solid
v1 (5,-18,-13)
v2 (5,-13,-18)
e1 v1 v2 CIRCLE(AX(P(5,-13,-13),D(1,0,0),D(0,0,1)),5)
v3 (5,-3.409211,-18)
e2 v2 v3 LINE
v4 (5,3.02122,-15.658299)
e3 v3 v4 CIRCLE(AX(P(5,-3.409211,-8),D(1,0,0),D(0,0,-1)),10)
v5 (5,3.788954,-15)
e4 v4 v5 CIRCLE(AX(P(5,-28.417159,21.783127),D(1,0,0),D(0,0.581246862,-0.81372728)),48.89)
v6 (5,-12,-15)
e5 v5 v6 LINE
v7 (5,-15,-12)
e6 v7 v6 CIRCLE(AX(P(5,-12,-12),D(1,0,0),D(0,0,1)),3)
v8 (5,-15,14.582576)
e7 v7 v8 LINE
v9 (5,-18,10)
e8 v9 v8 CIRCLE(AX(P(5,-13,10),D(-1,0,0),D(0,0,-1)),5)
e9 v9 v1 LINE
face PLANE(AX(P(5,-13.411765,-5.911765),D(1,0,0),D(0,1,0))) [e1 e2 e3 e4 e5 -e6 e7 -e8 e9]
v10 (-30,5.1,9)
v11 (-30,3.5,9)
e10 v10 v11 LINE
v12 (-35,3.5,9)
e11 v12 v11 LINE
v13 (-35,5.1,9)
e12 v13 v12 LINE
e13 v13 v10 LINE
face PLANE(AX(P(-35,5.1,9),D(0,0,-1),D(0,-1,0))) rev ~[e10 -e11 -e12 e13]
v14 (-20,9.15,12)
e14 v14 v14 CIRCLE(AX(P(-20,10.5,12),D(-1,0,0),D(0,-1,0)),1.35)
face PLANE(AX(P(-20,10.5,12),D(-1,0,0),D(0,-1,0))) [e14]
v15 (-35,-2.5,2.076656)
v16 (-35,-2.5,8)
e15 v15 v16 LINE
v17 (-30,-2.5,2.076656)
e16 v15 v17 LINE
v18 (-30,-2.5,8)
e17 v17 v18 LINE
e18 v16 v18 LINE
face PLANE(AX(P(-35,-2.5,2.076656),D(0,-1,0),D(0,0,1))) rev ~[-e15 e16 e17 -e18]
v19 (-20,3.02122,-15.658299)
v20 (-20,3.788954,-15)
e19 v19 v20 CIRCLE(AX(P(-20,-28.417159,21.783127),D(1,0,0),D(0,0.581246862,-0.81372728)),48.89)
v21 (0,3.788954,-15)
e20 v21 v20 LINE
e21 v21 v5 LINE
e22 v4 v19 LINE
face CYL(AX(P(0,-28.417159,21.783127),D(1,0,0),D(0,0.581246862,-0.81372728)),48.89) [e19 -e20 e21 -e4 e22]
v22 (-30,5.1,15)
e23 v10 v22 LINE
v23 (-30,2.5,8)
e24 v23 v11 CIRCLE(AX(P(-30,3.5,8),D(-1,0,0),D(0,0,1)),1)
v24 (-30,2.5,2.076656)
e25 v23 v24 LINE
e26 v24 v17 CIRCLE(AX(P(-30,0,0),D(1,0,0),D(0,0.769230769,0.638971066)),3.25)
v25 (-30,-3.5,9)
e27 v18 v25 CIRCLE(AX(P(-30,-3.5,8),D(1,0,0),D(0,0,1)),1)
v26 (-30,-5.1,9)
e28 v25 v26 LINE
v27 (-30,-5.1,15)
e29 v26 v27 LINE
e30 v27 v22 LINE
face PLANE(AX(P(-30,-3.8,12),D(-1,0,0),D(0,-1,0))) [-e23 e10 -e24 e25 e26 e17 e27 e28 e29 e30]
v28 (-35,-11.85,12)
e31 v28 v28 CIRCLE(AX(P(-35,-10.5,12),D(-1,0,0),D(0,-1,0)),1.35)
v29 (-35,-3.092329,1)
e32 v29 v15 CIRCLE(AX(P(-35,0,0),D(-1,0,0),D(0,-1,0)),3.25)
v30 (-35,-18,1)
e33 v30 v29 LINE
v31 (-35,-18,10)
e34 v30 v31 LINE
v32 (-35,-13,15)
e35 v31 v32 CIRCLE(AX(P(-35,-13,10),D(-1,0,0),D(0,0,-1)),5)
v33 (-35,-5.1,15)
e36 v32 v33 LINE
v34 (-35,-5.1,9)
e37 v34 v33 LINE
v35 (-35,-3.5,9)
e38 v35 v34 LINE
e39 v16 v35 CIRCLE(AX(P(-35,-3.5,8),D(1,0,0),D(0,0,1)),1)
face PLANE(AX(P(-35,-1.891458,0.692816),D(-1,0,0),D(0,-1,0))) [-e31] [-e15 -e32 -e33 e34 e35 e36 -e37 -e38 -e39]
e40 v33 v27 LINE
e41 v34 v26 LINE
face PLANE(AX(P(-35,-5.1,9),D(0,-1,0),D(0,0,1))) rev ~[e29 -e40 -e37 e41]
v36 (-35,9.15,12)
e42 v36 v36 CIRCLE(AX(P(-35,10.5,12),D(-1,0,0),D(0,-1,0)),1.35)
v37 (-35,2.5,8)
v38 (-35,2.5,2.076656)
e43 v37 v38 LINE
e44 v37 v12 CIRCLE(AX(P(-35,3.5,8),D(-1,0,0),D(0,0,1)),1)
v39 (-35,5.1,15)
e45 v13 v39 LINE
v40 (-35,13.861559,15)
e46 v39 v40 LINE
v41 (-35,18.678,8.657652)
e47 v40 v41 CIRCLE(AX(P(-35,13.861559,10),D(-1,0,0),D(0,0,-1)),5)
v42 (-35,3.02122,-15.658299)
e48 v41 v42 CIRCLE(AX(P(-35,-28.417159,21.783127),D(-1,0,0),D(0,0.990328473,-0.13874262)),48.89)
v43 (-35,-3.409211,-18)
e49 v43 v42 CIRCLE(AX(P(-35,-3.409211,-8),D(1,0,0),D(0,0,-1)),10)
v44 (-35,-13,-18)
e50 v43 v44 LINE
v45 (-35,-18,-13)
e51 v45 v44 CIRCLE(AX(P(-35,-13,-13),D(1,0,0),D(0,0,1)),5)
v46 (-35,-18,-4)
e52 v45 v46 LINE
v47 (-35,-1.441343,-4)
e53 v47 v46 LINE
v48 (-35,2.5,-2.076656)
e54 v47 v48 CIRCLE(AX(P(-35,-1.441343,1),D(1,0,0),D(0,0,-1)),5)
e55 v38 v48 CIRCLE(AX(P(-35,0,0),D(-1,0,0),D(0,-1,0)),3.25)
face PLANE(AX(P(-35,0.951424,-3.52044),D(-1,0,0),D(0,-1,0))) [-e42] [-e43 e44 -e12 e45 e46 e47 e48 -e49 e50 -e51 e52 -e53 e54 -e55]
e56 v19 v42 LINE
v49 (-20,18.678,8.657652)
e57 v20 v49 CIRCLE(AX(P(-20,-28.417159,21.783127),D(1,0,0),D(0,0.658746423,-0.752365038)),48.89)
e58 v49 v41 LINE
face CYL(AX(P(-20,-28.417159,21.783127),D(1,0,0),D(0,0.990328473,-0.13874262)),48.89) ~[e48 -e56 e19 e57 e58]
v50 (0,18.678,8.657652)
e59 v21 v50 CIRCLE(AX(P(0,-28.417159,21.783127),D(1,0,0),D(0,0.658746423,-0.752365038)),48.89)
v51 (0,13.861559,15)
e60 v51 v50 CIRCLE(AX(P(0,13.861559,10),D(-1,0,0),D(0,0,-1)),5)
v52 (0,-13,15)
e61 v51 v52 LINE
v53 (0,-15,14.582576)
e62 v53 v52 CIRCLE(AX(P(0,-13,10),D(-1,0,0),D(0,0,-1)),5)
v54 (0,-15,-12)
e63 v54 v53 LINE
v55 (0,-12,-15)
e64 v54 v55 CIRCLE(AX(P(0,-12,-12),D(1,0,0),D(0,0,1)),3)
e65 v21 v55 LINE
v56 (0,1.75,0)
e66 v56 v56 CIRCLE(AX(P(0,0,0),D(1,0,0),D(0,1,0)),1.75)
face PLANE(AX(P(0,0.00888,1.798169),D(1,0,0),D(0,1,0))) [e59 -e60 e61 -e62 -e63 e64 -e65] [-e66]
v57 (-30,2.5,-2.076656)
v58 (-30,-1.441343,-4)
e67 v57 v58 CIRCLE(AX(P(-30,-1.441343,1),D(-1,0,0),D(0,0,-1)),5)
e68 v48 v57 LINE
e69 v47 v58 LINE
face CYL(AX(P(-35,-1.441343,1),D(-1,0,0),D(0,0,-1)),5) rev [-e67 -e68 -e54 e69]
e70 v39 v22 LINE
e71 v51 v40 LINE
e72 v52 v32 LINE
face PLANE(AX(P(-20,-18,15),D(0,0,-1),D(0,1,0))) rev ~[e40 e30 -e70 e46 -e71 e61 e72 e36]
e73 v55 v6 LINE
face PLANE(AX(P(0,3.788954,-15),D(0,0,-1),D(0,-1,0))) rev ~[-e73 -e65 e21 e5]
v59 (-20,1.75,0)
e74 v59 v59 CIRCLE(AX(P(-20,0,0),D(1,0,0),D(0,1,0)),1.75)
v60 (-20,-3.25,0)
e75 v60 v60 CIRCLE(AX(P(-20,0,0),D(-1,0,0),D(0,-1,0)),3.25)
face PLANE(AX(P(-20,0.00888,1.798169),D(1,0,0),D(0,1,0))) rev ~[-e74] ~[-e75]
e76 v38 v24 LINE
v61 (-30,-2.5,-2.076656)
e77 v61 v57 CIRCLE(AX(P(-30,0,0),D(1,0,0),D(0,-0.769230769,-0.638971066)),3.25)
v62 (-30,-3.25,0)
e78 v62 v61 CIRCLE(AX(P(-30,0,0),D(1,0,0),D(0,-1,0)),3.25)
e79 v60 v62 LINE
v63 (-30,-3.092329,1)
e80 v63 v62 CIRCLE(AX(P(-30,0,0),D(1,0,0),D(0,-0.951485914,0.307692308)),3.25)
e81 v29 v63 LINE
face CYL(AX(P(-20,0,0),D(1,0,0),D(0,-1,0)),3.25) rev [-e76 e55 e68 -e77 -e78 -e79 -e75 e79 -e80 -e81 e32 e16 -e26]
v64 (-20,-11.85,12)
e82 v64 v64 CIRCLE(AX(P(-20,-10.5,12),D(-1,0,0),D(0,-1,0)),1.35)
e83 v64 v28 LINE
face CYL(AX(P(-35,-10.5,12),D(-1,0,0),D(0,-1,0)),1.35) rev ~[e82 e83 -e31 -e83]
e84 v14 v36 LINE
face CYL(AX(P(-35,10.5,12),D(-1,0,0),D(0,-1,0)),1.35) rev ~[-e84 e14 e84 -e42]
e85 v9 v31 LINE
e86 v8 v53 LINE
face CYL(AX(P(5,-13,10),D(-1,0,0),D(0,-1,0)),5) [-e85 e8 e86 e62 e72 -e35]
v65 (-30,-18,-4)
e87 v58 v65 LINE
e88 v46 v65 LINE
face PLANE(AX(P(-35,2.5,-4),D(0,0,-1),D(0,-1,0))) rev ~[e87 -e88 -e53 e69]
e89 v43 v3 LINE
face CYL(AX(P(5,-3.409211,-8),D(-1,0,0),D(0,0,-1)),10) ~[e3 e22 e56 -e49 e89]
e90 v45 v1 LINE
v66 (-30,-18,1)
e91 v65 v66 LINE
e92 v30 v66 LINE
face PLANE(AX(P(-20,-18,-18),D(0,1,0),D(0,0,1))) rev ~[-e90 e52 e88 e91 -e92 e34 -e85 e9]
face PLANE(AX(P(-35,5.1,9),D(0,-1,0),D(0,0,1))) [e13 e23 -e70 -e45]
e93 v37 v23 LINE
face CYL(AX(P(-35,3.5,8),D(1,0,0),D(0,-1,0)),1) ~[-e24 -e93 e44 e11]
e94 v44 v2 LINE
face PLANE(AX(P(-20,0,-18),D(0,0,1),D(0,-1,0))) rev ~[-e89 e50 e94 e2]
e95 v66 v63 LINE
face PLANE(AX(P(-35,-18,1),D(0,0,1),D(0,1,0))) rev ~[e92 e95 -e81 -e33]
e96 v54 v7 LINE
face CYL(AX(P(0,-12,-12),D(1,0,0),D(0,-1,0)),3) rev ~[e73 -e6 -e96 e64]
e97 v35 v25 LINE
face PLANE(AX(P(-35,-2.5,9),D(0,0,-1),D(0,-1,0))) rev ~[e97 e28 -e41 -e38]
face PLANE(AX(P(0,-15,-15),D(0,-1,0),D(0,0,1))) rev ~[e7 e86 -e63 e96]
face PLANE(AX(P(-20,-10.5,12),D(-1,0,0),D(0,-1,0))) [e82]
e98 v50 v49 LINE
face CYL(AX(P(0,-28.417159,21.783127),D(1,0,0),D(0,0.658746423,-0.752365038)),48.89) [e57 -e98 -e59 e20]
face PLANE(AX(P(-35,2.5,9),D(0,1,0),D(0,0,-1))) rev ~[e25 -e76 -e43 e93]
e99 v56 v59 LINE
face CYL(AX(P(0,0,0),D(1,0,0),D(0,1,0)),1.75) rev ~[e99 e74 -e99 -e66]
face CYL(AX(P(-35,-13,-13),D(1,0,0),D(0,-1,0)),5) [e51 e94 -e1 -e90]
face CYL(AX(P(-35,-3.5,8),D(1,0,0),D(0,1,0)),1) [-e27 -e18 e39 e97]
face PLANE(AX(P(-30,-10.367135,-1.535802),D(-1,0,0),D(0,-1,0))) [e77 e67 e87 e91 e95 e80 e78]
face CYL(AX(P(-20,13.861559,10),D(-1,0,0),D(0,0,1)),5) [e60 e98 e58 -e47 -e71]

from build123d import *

# Parameters (mm, degrees)
F1_DEPTH     = 5
F0_R         = 1.75
F2_DEPTH     = 20
F3_R         = 3.25
F4_DEPTH     = 15
F5_R         = 1.35
F5_W         = 2.6
F5_H         = 6
F5_W_2       = 5
F6_DEPTH     = 5
F7_DEPTH     = 10
F8_R         = 3
F9_R         = 5
F10_T1_DEPTH = 14.8533585862
F11_R        = 1
F12_R        = 5
F13_R        = 5
F14_R        = 10


# Not quite as in the source:
# - a fillet or chamfer that OpenCascade refuses, or shapes differently, is made with other operations: its cross-section is extruded or revolved along the edge and cut away or added


with BuildPart() as f1:
    # F0 (on Right) → F1 (new body)
    with BuildSketch(Plane.YZ):
        Polygon((-15, -15), (-15, 0), (-15, 15), (-18, 15), (-18, 0), (-18, -18), (0, -18), (0, -15), align=None)
        with BuildLine():
            Line((3.7889535467, -15), (0, -15))
            Line((0, -15), (0, -18))
            ThreePointArc((0, -18), (1.9315685392, -16.546846326), (3.7889535467, -15))
        make_face()
    extrude(amount=F1_DEPTH)

    # F0 (on Right) → F2 (join)
    with BuildSketch(Plane.YZ):
        with BuildLine():
            Line((-15, 15), (-15, 0))
            Line((-15, 0), (-15, -15))
            Line((-15, -15), (0, -15))
            Line((0, -15), (3.7889535467, -15))
            ThreePointArc((3.7889535467, -15), (14.5947925758, -1.4591648304), (20, 15))
            Line((20, 15), (-15, 15))
        make_face()
        Circle(F0_R, mode=Mode.SUBTRACT)
        Polygon((-15, -15), (-15, 0), (-15, 15), (-18, 15), (-18, 0), (-18, -18), (0, -18), (0, -15), align=None)
        with BuildLine():
            Line((3.7889535467, -15), (0, -15))
            Line((0, -15), (0, -18))
            ThreePointArc((0, -18), (1.9315685392, -16.546846326), (3.7889535467, -15))
        make_face()
    extrude(amount=-F2_DEPTH)

    # F3 (on face) → F4 (join)
    with BuildSketch(Plane(origin=(-20, 0, 0), x_dir=(0, -1, 0), z_dir=(-1, 0, 0))):
        with BuildLine():
            Line((18, -18), (18, 15))
            Line((18, 15), (-20, 15))
            ThreePointArc((-20, 15), (-13.3934629181, -3.5566441928), (0, -18))
            Line((0, -18), (18, -18))
        make_face()
        Circle(F3_R, mode=Mode.SUBTRACT)
    extrude(amount=F4_DEPTH)

    # F5 (on face) → F6 (cut)
    with BuildSketch(Plane(origin=(-35, 0, 0), x_dir=(0, -1, 0), z_dir=(-1, 0, 0))):
        with Locations((-10.5, 12)):
            Circle(F5_R)
        with Locations((10.5, 12)):
            Circle(F5_R)
        with Locations((3.8, 12)):
            Rectangle(F5_W, F5_H)
        with BuildLine():
            Line((2.5, 2.0766559657), (2.5, 9))
            Line((2.5, 9), (-2.5, 9))
            Line((-2.5, 9), (-2.5, 2.0766559657))
            ThreePointArc((-2.5, 2.0766559657), (0, 3.25), (2.5, 2.0766559657))
        make_face()
        with Locations((0, 12)):
            Rectangle(F5_W_2, F5_H)
        with Locations((-3.8, 12)):
            Rectangle(F5_W, F5_H)
        with BuildLine():
            Line((18, 1), (3.0923292192, 1))
            ThreePointArc((3.0923292192, 1), (3.2103403217, 0.5061768651), (3.25, 0))
            ThreePointArc((3.25, 0), (3.0567548152, -1.1039701083), (2.5, -2.0766559657))
            Line((2.5, -2.0766559657), (2.5, -4))
            Line((2.5, -4), (18, -4))
            Line((18, -4), (18, 1))
        make_face()
        with BuildLine():
            ThreePointArc((2.5, -2.0766559657), (0, -3.25), (-2.5, -2.0766559657))
            Line((-2.5, -2.0766559657), (-2.5, -4))
            Line((-2.5, -4), (0, -4))
            Line((0, -4), (2.5, -4))
            Line((2.5, -4), (2.5, -2.0766559657))
        make_face()
    extrude(amount=-F6_DEPTH, mode=Mode.SUBTRACT)

    # F7 (cut): faces of the model
    f7_faces = [f1.faces().sort_by_distance(p)[0] for p in [
        (-30, 10.5, 12),
        (-30, -10.5, 12),
    ]]
    extrude(f7_faces, amount=-F7_DEPTH, mode=Mode.SUBTRACT)

    # F8
    f8_edges = [f1.edges().sort_by_distance(p)[0] for p in [
        (2.5, -15, -15),
    ]]
    fillet(f8_edges, radius=F8_R)

    # F9
    f9_edges = [f1.edges().sort_by_distance(p)[0] for p in [
        (-15, -18, -18),
    ]]
    fillet(f9_edges, radius=F9_R)

    # F10: fillet of radius 5 on 1 edges, made by hand

    # F10_s2 → F10_t1 (join)
    with BuildSketch(Plane.YZ.offset(-35)):
        with BuildLine():
            ThreePointArc((-1.4413434345, -4), (0.7514538853, -3.4935108673), (2.5, -2.0766559657))
            Line((2.5, -2.0766559657), (2.5, -4))
            Line((2.5, -4), (-1.4413434345, -4))
        make_face()
    extrude(amount=F10_T1_DEPTH)

    # F11
    f11_edges = [f1.edges().sort_by_distance(p)[0] for p in [
        (-32.5, 2.5, 9),
        (-32.5, -2.5, 9),
    ]]
    fillet(f11_edges, radius=F11_R)

    # F12
    f12_edges = [f1.edges().sort_by_distance(p)[0] for p in [
        (-17.5, 20, 15),
    ]]
    fillet(f12_edges, radius=F12_R)

    # F13
    f13_edges = [f1.edges().sort_by_distance(p)[0] for p in [
        (-15, -18, 15),
    ]]
    fillet(f13_edges, radius=F13_R)

    # F14
    f14_edges = [f1.edges().sort_by_distance(p)[0] for p in [
        (-15, 0, -18),
    ]]
    fillet(f14_edges, radius=F14_R)


solid = f1.part
